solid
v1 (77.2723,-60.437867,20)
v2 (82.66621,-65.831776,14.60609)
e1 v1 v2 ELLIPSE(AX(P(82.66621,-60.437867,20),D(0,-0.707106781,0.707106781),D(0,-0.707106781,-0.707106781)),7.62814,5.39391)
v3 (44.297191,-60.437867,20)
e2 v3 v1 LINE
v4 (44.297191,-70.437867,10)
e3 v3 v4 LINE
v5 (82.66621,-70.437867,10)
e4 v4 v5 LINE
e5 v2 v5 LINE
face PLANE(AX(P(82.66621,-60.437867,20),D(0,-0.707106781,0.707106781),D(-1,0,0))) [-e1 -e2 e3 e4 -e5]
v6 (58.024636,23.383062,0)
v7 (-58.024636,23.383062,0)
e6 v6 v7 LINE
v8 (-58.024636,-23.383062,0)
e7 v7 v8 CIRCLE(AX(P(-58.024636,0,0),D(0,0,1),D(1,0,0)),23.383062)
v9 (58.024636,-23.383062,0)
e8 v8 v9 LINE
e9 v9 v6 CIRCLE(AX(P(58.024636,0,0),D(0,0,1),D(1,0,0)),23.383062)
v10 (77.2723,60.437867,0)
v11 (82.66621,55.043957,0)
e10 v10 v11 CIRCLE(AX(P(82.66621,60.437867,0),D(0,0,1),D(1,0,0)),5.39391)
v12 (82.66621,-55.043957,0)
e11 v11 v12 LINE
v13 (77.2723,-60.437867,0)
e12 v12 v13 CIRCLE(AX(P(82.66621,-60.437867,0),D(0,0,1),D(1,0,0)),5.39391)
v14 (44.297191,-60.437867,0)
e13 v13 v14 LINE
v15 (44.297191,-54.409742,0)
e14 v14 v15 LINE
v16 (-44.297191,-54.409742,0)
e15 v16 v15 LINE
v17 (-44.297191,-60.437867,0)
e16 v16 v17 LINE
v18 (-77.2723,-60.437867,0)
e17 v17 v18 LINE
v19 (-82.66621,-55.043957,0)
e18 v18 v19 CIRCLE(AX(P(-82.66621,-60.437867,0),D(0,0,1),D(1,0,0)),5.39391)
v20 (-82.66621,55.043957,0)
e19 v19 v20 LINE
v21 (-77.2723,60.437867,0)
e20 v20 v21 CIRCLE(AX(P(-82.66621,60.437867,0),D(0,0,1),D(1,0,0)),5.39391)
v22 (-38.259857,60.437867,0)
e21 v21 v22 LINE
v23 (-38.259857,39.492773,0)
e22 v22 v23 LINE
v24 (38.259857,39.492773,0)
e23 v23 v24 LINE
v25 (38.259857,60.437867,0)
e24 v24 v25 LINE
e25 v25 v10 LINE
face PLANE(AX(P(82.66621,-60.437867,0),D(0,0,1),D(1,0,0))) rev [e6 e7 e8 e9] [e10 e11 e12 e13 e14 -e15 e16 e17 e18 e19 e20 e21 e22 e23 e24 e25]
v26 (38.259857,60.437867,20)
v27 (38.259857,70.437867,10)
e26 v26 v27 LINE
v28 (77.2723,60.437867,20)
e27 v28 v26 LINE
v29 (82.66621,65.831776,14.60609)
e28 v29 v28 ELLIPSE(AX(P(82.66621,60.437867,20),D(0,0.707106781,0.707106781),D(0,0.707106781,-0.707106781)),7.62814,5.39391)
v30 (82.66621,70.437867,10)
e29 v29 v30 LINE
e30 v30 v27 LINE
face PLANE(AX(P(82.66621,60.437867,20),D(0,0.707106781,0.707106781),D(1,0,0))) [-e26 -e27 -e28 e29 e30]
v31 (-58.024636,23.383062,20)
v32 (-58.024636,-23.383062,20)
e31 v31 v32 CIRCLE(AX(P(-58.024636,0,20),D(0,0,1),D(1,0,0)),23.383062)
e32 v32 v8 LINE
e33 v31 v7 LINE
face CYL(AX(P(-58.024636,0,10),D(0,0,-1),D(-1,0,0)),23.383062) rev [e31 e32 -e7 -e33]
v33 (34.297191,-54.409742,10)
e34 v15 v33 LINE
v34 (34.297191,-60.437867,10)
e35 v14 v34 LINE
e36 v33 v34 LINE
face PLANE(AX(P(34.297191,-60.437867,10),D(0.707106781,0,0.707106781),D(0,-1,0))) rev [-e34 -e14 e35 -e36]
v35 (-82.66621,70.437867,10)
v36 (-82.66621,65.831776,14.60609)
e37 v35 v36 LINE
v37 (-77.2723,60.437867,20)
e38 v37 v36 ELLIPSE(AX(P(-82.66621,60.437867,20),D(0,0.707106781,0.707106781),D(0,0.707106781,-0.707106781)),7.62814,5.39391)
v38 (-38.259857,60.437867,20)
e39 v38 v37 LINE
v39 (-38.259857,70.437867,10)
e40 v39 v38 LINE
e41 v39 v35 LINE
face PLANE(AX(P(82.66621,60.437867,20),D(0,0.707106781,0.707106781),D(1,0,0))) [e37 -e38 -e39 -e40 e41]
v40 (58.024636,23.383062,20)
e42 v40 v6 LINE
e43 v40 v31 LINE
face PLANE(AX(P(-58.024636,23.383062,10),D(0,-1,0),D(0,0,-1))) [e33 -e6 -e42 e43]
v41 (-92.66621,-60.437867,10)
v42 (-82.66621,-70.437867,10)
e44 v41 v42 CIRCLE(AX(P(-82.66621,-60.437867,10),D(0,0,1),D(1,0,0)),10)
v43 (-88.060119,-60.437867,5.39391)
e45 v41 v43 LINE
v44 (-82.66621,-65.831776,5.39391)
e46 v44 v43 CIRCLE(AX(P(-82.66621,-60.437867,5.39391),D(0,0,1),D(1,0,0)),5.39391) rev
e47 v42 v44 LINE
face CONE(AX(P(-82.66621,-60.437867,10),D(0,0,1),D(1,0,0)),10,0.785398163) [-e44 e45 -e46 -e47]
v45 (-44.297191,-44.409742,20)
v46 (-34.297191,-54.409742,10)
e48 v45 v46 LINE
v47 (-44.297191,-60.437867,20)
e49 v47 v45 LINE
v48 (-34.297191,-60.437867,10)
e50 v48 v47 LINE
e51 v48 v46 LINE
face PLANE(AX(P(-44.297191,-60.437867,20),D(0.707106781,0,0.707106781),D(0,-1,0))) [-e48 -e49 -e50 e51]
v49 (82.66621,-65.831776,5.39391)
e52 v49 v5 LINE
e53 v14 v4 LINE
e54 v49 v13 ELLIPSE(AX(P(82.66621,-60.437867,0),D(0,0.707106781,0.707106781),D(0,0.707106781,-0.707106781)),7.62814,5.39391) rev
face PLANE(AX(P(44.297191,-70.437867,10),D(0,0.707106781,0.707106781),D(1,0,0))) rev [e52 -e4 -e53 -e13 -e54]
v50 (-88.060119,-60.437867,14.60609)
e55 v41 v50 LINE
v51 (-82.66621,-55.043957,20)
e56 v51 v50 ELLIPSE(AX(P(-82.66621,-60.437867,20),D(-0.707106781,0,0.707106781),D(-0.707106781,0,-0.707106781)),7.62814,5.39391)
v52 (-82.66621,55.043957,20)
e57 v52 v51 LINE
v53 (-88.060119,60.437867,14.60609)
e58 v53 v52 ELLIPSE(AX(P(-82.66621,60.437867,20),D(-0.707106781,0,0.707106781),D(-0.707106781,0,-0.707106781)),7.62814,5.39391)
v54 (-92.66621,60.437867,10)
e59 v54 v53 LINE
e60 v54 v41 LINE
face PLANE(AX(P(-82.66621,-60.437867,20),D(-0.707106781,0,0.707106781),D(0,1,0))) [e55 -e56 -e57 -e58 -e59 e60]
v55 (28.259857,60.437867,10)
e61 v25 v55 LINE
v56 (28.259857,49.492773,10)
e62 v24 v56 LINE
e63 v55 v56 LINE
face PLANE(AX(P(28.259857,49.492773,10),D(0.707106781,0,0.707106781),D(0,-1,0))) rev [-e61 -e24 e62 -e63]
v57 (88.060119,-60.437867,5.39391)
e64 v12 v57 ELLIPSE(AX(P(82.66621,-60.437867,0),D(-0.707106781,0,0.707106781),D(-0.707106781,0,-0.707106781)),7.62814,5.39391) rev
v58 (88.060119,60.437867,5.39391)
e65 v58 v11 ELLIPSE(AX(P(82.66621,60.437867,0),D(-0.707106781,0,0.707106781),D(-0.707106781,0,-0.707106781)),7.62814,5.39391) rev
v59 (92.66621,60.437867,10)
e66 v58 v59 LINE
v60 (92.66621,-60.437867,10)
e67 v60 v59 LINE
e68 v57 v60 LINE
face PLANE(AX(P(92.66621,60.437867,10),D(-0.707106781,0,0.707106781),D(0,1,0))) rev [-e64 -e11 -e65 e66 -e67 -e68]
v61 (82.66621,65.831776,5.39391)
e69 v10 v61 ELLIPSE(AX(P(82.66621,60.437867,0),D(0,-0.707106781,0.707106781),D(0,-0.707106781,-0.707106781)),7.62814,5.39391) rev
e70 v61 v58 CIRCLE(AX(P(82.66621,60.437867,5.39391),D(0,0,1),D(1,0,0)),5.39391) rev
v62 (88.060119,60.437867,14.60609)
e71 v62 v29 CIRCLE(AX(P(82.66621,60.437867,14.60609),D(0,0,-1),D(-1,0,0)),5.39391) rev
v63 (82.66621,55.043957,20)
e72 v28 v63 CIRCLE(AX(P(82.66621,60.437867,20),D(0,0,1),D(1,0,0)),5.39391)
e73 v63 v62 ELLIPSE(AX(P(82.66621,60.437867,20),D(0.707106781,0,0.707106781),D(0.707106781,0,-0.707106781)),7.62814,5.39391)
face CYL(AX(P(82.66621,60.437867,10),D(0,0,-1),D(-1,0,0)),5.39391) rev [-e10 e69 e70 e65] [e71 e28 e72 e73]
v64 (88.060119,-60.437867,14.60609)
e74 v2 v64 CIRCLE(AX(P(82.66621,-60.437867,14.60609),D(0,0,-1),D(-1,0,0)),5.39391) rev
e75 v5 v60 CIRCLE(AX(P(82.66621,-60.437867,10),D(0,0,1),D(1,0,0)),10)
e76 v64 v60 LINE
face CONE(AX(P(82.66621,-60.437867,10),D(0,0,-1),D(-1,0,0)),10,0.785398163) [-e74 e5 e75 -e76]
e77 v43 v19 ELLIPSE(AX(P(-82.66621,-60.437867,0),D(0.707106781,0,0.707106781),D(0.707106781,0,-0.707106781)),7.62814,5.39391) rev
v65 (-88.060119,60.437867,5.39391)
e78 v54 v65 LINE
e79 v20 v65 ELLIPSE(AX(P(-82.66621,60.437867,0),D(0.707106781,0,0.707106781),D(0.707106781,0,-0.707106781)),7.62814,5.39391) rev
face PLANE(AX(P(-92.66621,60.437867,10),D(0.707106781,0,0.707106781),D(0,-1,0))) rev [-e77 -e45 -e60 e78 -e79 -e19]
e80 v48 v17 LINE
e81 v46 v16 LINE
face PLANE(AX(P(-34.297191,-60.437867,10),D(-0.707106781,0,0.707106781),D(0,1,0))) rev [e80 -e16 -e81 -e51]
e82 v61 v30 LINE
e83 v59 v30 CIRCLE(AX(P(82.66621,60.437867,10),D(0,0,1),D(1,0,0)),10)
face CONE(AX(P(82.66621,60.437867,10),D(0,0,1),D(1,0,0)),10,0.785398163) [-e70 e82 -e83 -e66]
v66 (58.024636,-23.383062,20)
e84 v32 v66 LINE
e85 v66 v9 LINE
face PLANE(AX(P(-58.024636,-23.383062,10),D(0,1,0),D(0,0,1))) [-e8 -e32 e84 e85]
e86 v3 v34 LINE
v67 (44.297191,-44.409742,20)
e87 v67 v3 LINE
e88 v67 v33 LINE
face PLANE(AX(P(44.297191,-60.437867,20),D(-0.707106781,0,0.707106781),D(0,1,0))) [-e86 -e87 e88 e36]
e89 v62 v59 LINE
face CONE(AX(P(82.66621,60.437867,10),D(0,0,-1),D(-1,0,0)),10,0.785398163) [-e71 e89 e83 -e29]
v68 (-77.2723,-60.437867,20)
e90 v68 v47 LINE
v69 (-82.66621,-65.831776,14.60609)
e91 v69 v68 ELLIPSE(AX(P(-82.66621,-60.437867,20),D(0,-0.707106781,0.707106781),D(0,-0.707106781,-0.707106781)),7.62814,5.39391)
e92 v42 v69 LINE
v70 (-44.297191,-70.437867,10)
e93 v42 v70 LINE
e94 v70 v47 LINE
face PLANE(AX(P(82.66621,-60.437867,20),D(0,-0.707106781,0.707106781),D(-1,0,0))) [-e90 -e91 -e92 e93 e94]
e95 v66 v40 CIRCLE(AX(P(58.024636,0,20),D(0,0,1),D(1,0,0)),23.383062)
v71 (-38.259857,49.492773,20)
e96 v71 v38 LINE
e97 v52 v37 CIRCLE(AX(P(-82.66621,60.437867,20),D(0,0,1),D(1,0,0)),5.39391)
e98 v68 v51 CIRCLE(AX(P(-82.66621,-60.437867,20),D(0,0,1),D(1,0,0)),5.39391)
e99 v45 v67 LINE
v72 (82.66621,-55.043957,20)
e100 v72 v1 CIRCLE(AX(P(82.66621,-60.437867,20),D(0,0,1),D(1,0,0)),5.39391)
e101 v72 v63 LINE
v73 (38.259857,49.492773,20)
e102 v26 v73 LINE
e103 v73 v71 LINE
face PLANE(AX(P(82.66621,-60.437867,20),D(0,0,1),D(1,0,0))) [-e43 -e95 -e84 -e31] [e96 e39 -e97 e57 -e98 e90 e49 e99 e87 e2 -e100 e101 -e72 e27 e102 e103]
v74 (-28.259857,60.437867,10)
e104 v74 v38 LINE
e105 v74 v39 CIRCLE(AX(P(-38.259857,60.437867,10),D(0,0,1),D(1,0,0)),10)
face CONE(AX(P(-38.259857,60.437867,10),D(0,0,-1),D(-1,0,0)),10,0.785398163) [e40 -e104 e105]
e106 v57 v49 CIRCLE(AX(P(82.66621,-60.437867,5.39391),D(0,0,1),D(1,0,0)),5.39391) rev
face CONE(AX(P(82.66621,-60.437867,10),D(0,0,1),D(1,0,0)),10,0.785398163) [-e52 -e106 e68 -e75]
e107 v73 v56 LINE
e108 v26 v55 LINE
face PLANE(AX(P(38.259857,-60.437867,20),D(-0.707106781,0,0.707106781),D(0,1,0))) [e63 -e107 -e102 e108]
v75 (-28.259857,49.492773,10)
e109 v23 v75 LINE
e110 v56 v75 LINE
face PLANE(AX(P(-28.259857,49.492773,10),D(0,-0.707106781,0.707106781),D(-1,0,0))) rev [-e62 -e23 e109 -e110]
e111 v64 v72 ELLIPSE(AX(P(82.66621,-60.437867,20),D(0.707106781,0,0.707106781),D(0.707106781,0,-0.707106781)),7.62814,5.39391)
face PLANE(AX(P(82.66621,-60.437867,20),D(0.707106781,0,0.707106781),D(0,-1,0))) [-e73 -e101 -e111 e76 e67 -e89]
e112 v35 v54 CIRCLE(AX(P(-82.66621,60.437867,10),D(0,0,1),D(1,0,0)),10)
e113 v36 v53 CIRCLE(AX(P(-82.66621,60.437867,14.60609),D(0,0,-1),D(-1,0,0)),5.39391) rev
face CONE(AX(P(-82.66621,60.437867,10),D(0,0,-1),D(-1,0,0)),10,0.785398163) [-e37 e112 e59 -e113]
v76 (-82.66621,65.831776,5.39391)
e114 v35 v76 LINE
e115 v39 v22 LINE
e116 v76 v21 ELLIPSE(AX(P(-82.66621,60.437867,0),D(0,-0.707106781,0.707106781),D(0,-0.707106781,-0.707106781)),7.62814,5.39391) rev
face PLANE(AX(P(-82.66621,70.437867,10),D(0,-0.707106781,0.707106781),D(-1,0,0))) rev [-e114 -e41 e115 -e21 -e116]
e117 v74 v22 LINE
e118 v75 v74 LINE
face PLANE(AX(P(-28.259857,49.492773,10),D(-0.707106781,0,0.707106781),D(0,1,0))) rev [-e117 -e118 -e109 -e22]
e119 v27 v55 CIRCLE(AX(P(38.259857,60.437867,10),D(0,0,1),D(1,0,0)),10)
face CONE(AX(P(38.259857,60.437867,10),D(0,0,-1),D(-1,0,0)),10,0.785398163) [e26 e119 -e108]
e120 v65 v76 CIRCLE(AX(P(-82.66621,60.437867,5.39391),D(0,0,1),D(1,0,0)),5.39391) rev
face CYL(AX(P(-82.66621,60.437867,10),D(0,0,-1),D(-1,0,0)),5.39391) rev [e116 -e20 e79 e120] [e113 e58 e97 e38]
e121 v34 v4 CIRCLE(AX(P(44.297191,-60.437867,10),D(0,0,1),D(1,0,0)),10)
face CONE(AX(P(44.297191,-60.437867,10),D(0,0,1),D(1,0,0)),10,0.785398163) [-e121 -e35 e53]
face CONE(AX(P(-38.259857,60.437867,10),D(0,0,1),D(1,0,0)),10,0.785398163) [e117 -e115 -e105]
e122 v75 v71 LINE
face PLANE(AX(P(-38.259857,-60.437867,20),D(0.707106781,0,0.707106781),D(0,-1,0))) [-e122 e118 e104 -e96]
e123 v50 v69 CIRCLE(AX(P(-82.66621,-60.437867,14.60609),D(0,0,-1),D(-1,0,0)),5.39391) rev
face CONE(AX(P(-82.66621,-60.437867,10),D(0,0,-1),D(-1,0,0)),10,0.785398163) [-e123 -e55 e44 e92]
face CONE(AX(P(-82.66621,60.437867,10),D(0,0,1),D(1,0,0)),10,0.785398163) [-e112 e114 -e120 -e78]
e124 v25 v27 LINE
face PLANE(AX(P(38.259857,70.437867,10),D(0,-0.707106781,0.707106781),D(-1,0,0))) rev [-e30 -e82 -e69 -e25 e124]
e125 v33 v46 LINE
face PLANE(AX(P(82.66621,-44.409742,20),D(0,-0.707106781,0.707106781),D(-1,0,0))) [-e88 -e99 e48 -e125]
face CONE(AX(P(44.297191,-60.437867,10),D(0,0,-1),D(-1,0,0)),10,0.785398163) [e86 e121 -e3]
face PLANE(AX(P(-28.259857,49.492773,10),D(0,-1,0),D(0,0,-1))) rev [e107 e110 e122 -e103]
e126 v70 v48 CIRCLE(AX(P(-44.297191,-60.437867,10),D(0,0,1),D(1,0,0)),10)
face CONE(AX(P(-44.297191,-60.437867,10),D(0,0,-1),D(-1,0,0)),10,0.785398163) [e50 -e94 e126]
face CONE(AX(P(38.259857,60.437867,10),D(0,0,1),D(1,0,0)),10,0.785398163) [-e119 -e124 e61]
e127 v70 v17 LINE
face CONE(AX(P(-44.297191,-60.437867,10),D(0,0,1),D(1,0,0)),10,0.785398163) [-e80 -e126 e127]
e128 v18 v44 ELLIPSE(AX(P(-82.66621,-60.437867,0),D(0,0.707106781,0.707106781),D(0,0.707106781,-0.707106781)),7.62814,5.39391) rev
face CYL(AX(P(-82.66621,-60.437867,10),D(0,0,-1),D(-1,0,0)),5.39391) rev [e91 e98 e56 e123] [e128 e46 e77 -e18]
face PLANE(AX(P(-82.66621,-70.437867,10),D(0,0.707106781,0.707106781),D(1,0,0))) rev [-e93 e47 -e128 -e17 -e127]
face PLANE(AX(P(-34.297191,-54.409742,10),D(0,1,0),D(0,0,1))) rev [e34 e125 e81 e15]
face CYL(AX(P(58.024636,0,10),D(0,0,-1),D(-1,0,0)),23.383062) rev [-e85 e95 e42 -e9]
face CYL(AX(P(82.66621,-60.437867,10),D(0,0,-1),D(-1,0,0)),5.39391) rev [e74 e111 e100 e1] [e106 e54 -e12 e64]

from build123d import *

# Parameters (mm, degrees)
SKETCH2_R           = 5.393909569
BOSS_EXTRUDE1_DEPTH = 10
SKETCH2_2_R         = 5.393909569
BOSS_EXTRUDE2_DEPTH = 20
CHAMFER1_SIZE       = 10
CHAMFER3_SIZE       = 10
CHAMFER4_SIZE       = 10
CHAMFER5_SIZE       = 10
CHAMFER6_SIZE       = 10


with BuildPart() as part:
    # Sketch2 → Boss-Extrude1 (new body)
    with BuildSketch(Plane.XY):
        with BuildLine():
            Line((-82.666209824, 70.437866658), (-38.259856652, 70.437866658))
            ThreePointArc((-38.259856652, 70.437866658), (-31.18878884, 67.50893447), (-28.259856652, 60.437866658))
            Line((-28.259856652, 60.437866658), (-28.259856652, 49.492772702))
            Line((-28.259856652, 49.492772702), (28.259856652, 49.492772702))
            Line((28.259856652, 49.492772702), (28.259856652, 60.437866658))
            ThreePointArc((28.259856652, 60.437866658), (31.18878884, 67.50893447), (38.259856652, 70.437866658))
            Line((38.259856652, 70.437866658), (82.666209824, 70.437866658))
            ThreePointArc((82.666209824, 70.437866658), (89.737277636, 67.50893447), (92.666209824, 60.437866658))
            Line((92.666209824, 60.437866658), (92.666209824, -60.437866658))
            ThreePointArc((92.666209824, -60.437866658), (89.737277636, -67.50893447), (82.666209824, -70.437866658))
            Line((82.666209824, -70.437866658), (44.297191223, -70.437866658))
            ThreePointArc((44.297191223, -70.437866658), (37.226123411, -67.50893447), (34.297191223, -60.437866658))
            Line((34.297191223, -60.437866658), (34.297191223, -54.409741631))
            Line((34.297191223, -54.409741631), (-34.297191223, -54.409741631))
            Line((-34.297191223, -54.409741631), (-34.297191223, -60.437866658))
            ThreePointArc((-34.297191223, -60.437866658), (-37.226123411, -67.50893447), (-44.297191223, -70.437866658))
            Line((-44.297191223, -70.437866658), (-82.666209824, -70.437866658))
            ThreePointArc((-82.666209824, -70.437866658), (-89.737277636, -67.50893447), (-92.666209824, -60.437866658))
            Line((-92.666209824, -60.437866658), (-92.666209824, 60.437866658))
            ThreePointArc((-92.666209824, 60.437866658), (-89.737277636, 67.50893447), (-82.666209824, 70.437866658))
        make_face()
        with Locations((82.666209824, -60.437866658)):
            Circle(SKETCH2_R, mode=Mode.SUBTRACT)
        with Locations((82.666209824, 60.437866658)):
            Circle(SKETCH2_R, mode=Mode.SUBTRACT)
        with Locations((-82.666209824, 60.437866658)):
            Circle(SKETCH2_R, mode=Mode.SUBTRACT)
        with Locations((-82.666209824, -60.437866658)):
            Circle(SKETCH2_R, mode=Mode.SUBTRACT)
        with BuildLine():
            Line((-58.024636058, 23.383062292), (58.024636058, 23.383062292))
            ThreePointArc((58.024636058, 23.383062292), (81.40769835, 0), (58.024636058, -23.383062292))
            Line((58.024636058, -23.383062292), (-58.024636058, -23.383062292))
            ThreePointArc((-58.024636058, -23.383062292), (-81.40769835, 0), (-58.024636058, 23.383062292))
        make_face(mode=Mode.SUBTRACT)
    extrude(amount=BOSS_EXTRUDE1_DEPTH)

    # Sketch2<2> → Boss-Extrude2 (add)
    with BuildSketch(Plane.XY):
        with BuildLine():
            Line((-82.666209824, 70.437866658), (-38.259856652, 70.437866658))
            ThreePointArc((-38.259856652, 70.437866658), (-31.18878884, 67.50893447), (-28.259856652, 60.437866658))
            Line((-28.259856652, 60.437866658), (-28.259856652, 49.492772702))
            Line((-28.259856652, 49.492772702), (28.259856652, 49.492772702))
            Line((28.259856652, 49.492772702), (28.259856652, 60.437866658))
            ThreePointArc((28.259856652, 60.437866658), (31.18878884, 67.50893447), (38.259856652, 70.437866658))
            Line((38.259856652, 70.437866658), (82.666209824, 70.437866658))
            ThreePointArc((82.666209824, 70.437866658), (89.737277636, 67.50893447), (92.666209824, 60.437866658))
            Line((92.666209824, 60.437866658), (92.666209824, -60.437866658))
            ThreePointArc((92.666209824, -60.437866658), (89.737277636, -67.50893447), (82.666209824, -70.437866658))
            Line((82.666209824, -70.437866658), (44.297191223, -70.437866658))
            ThreePointArc((44.297191223, -70.437866658), (37.226123411, -67.50893447), (34.297191223, -60.437866658))
            Line((34.297191223, -60.437866658), (34.297191223, -54.409741631))
            Line((34.297191223, -54.409741631), (-34.297191223, -54.409741631))
            Line((-34.297191223, -54.409741631), (-34.297191223, -60.437866658))
            ThreePointArc((-34.297191223, -60.437866658), (-37.226123411, -67.50893447), (-44.297191223, -70.437866658))
            Line((-44.297191223, -70.437866658), (-82.666209824, -70.437866658))
            ThreePointArc((-82.666209824, -70.437866658), (-89.737277636, -67.50893447), (-92.666209824, -60.437866658))
            Line((-92.666209824, -60.437866658), (-92.666209824, 60.437866658))
            ThreePointArc((-92.666209824, 60.437866658), (-89.737277636, 67.50893447), (-82.666209824, 70.437866658))
        make_face()
        with Locations((82.666209824, -60.437866658)):
            Circle(SKETCH2_2_R, mode=Mode.SUBTRACT)
        with Locations((82.666209824, 60.437866658)):
            Circle(SKETCH2_2_R, mode=Mode.SUBTRACT)
        with Locations((-82.666209824, 60.437866658)):
            Circle(SKETCH2_2_R, mode=Mode.SUBTRACT)
        with Locations((-82.666209824, -60.437866658)):
            Circle(SKETCH2_2_R, mode=Mode.SUBTRACT)
        with BuildLine():
            Line((-58.024636058, 23.383062292), (58.024636058, 23.383062292))
            ThreePointArc((58.024636058, 23.383062292), (81.40769835, 0), (58.024636058, -23.383062292))
            Line((58.024636058, -23.383062292), (-58.024636058, -23.383062292))
            ThreePointArc((-58.024636058, -23.383062292), (-81.40769835, 0), (-58.024636058, 23.383062292))
        make_face(mode=Mode.SUBTRACT)
    extrude(amount=BOSS_EXTRUDE2_DEPTH)

    # Chamfer1
    # the kernel refuses this chamfer: 10 mm, written as the material it takes off along each edge
    with BuildSketch(Plane(origin=(82.666209824, -70.437866658, 0), x_dir=(0, 1, 0), z_dir=(-1, 0, 0))) as chamfer1_piece_1:
        Polygon((CHAMFER1_SIZE, 0), (0, -CHAMFER1_SIZE), (0, 0), align=None)
    extrude(amount=38.369018602, mode=Mode.SUBTRACT)
    with BuildSketch(Plane(origin=(44.297191223, -60.437866658, 0), x_dir=(0, -1, 0), z_dir=(1, 0, 0))) as chamfer1_piece_2:
        Polygon((10 - CHAMFER1_SIZE, 0), (10, -CHAMFER1_SIZE), (10, 0), align=None)
    revolve(axis=Axis((44.297191223, -60.437866658, 0), (0, 0, -1)), revolution_arc=90, mode=Mode.SUBTRACT)
    with BuildSketch(Plane(origin=(34.297191223, -60.437866658, 0), x_dir=(1, 0, 0), z_dir=(0, 1, 0))) as chamfer1_piece_3:
        Polygon((CHAMFER1_SIZE, 0), (0, -CHAMFER1_SIZE), (0, 0), align=None)
    extrude(amount=6.028125027, mode=Mode.SUBTRACT)
    with BuildSketch(Plane(origin=(-28.259856652, 49.492772702, 0), x_dir=(0, -1, 0), z_dir=(1, 0, 0))) as chamfer1_piece_4:
        Polygon((CHAMFER1_SIZE, 0), (0, -CHAMFER1_SIZE), (0, 0), align=None)
    extrude(amount=56.519713304, mode=Mode.SUBTRACT)
    with BuildSketch(Plane(origin=(28.259856652, 49.492772702, 0), x_dir=(1, 0, 0), z_dir=(0, 1, 0))) as chamfer1_piece_5:
        Polygon((CHAMFER1_SIZE, 0), (0, -CHAMFER1_SIZE), (0, 0), align=None)
    extrude(amount=10.945093956, mode=Mode.SUBTRACT)
    with BuildSketch(Plane(origin=(38.259856652, 60.437866658, 0), x_dir=(-1, 0, 0), z_dir=(0, -1, 0))) as chamfer1_piece_6:
        Polygon((10 - CHAMFER1_SIZE, 0), (10, -CHAMFER1_SIZE), (10, 0), align=None)
    revolve(axis=Axis((38.259856652, 60.437866658, 0), (0, 0, -1)), revolution_arc=90, mode=Mode.SUBTRACT)
    with BuildSketch(Plane(origin=(38.259856652, 70.437866658, 0), x_dir=(0, -1, 0), z_dir=(1, 0, 0))) as chamfer1_piece_7:
        Polygon((CHAMFER1_SIZE, 0), (0, -CHAMFER1_SIZE), (0, 0), align=None)
    extrude(amount=44.406353173, mode=Mode.SUBTRACT)
    with BuildSketch(Plane(origin=(82.666209824, 60.437866658, 0), x_dir=(0, 1, 0), z_dir=(-1, 0, 0))) as chamfer1_piece_8:
        Polygon((10 - CHAMFER1_SIZE, 0), (10, -CHAMFER1_SIZE), (10, 0), align=None)
    revolve(axis=Axis((82.666209824, 60.437866658, 0), (0, 0, -1)), revolution_arc=90, mode=Mode.SUBTRACT)
    with BuildSketch(Plane(origin=(92.666209824, 60.437866658, 0), x_dir=(-1, 0, 0), z_dir=(0, -1, 0))) as chamfer1_piece_9:
        Polygon((CHAMFER1_SIZE, 0), (0, -CHAMFER1_SIZE), (0, 0), align=None)
    extrude(amount=120.875733316, mode=Mode.SUBTRACT)
    with BuildSketch(Plane(origin=(82.666209824, -60.437866658, 0), x_dir=(1, 0, 0), z_dir=(0, 1, 0))) as chamfer1_piece_10:
        Polygon((10 - CHAMFER1_SIZE, 0), (10, -CHAMFER1_SIZE), (10, 0), align=None)
    revolve(axis=Axis((82.666209824, -60.437866658, 0), (0, 0, -1)), revolution_arc=90, mode=Mode.SUBTRACT)
    with BuildSketch(Plane(origin=(-28.259856652, 49.492772702, 0), x_dir=(0, -1, 0), z_dir=(1, 0, 0))) as chamfer1_piece_11a_section:
        Polygon((CHAMFER1_SIZE, 0), (0, -CHAMFER1_SIZE), (0, 0), align=None)
    chamfer1_piece_11a = extrude(amount=82.236543183, mode=Mode.PRIVATE)
    chamfer1_piece_11a = split(chamfer1_piece_11a, bisect_by=Plane(origin=(28.259856652, 49.492772702, 0), z_dir=(1, 0, 0)), keep=Keep.TOP, mode=Mode.PRIVATE)
    with BuildSketch(Plane(origin=(28.259856652, 23.775942822, 0), x_dir=(1, 0, 0), z_dir=(0, 1, 0))) as chamfer1_piece_11b_section:
        Polygon((CHAMFER1_SIZE, 0), (0, -CHAMFER1_SIZE), (0, 0), align=None)
    chamfer1_piece_11b = extrude(amount=36.661923835, mode=Mode.PRIVATE)
    chamfer1_piece_11b = split(chamfer1_piece_11b, bisect_by=Plane(origin=(28.259856652, 49.492772702, 0), z_dir=(0, -1, 0)), keep=Keep.TOP, mode=Mode.PRIVATE)
    chamfer1_piece_11 = chamfer1_piece_11a & chamfer1_piece_11b
    add(chamfer1_piece_11, mode=Mode.SUBTRACT)

    # Chamfer3
    # the kernel refuses this chamfer: 10 mm, written as the material it takes off along each edge
    with BuildSketch(Plane(origin=(-34.297191223, -54.409741631, 0), x_dir=(-1, 0, 0), z_dir=(0, -1, 0))) as chamfer3_piece_1:
        Polygon((CHAMFER3_SIZE, 0), (0, -CHAMFER3_SIZE), (0, 0), align=None)
    extrude(amount=6.028125027, mode=Mode.SUBTRACT)
    with BuildSketch(Plane(origin=(-44.297191223, -60.437866658, 0), x_dir=(1, 0, 0), z_dir=(0, 1, 0))) as chamfer3_piece_2:
        Polygon((10, -CHAMFER3_SIZE), (10 - CHAMFER3_SIZE, 0), (10, 0), align=None)
    revolve(axis=Axis((-44.297191223, -60.437866658, 0), (0, 0, -1)), revolution_arc=90, mode=Mode.SUBTRACT)
    with BuildSketch(Plane(origin=(-44.297191223, -70.437866658, 0), x_dir=(0, 1, 0), z_dir=(-1, 0, 0))) as chamfer3_piece_3:
        Polygon((CHAMFER3_SIZE, 0), (0, -CHAMFER3_SIZE), (0, 0), align=None)
    extrude(amount=38.369018602, mode=Mode.SUBTRACT)
    with BuildSketch(Plane(origin=(-82.666209824, -60.437866658, 0), x_dir=(0, -1, 0), z_dir=(1, 0, 0))) as chamfer3_piece_4:
        Polygon((10 - CHAMFER3_SIZE, 0), (10, -CHAMFER3_SIZE), (10, 0), align=None)
    revolve(axis=Axis((-82.666209824, -60.437866658, 0), (0, 0, -1)), revolution_arc=90, mode=Mode.SUBTRACT)
    with BuildSketch(Plane(origin=(-92.666209824, -60.437866658, 0), x_dir=(1, 0, 0), z_dir=(0, 1, 0))) as chamfer3_piece_5:
        Polygon((CHAMFER3_SIZE, 0), (0, -CHAMFER3_SIZE), (0, 0), align=None)
    extrude(amount=120.875733316, mode=Mode.SUBTRACT)
    with BuildSketch(Plane(origin=(-82.666209824, 60.437866658, 0), x_dir=(-1, 0, 0), z_dir=(0, -1, 0))) as chamfer3_piece_6:
        Polygon((10 - CHAMFER3_SIZE, 0), (10, -CHAMFER3_SIZE), (10, 0), align=None)
    revolve(axis=Axis((-82.666209824, 60.437866658, 0), (0, 0, -1)), revolution_arc=90, mode=Mode.SUBTRACT)
    with BuildSketch(Plane(origin=(-82.666209824, 70.437866658, 0), x_dir=(0, -1, 0), z_dir=(1, 0, 0))) as chamfer3_piece_7:
        Polygon((CHAMFER3_SIZE, 0), (0, -CHAMFER3_SIZE), (0, 0), align=None)
    extrude(amount=44.406353173, mode=Mode.SUBTRACT)
    with BuildSketch(Plane(origin=(-38.259856652, 60.437866658, 0), x_dir=(0, 1, 0), z_dir=(-1, 0, 0))) as chamfer3_piece_8:
        Polygon((10 - CHAMFER3_SIZE, 0), (10, -CHAMFER3_SIZE), (10, 0), align=None)
    revolve(axis=Axis((-38.259856652, 60.437866658, 0), (0, 0, -1)), revolution_arc=90, mode=Mode.SUBTRACT)
    with BuildSketch(Plane(origin=(-28.259856652, 60.437866658, 0), x_dir=(-1, 0, 0), z_dir=(0, -1, 0))) as chamfer3_piece_9_section:
        Polygon((CHAMFER3_SIZE, 0), (0, -CHAMFER3_SIZE), (0, 0), align=None)
    chamfer3_piece_9 = extrude(amount=46.661923835, mode=Mode.PRIVATE)
    chamfer3_piece_9 = split(chamfer3_piece_9, bisect_by=Plane(origin=(-28.259856652, 49.492772702, 0), z_dir=(0, 1, 0)), keep=Keep.TOP, mode=Mode.PRIVATE)
    chamfer3_piece_9 = split(chamfer3_piece_9, bisect_by=Plane(origin=(-28.259856652, 49.96531968, 10.472546978), z_dir=(0, 0.7071067811865476, -0.7071067811865476)), keep=Keep.TOP, mode=Mode.PRIVATE)
    add(chamfer3_piece_9, mode=Mode.SUBTRACT)
    with BuildSketch(Plane(origin=(-28.259856652, 60.437866658, 0), x_dir=(-1, 0, 0), z_dir=(0, -1, 0))) as chamfer3_piece_10_section:
        Polygon((CHAMFER3_SIZE, 0), (0, -CHAMFER3_SIZE), (0, 0), align=None)
    chamfer3_piece_10 = extrude(amount=46.661923835, mode=Mode.PRIVATE)
    chamfer3_piece_10 = split(chamfer3_piece_10, bisect_by=Plane(origin=(-28.259856652, 49.492772702, 0), z_dir=(0, -1, 0)), keep=Keep.TOP, mode=Mode.PRIVATE)
    chamfer3_piece_10 = split(chamfer3_piece_10, bisect_by=Plane(origin=(-28.259856652, 49.96531968, 10.472546978), z_dir=(0, 0.7071067811865476, -0.7071067811865476)), keep=Keep.TOP, mode=Mode.PRIVATE)
    add(chamfer3_piece_10, mode=Mode.SUBTRACT)

    # Chamfer4
    # the kernel refuses this chamfer: 10 mm, written as the material it takes off along each edge
    with BuildSketch(Plane(origin=(28.259856652, 49.492772702, 20), x_dir=(1, 0, 0), z_dir=(0, 1, 0))) as chamfer4_piece_1:
        Polygon((CHAMFER4_SIZE, 0), (0, CHAMFER4_SIZE), (0, 0), align=None)
    extrude(amount=10.945093956, mode=Mode.SUBTRACT)
    with BuildSketch(Plane(origin=(38.259856652, 60.437866658, 20), x_dir=(-1, 0, 0), z_dir=(0, -1, 0))) as chamfer4_piece_2:
        Polygon((10 - CHAMFER4_SIZE, 0), (10, CHAMFER4_SIZE), (10, 0), align=None)
    revolve(axis=Axis((38.259856652, 60.437866658, 20), (0, 0, -1)), revolution_arc=90, mode=Mode.SUBTRACT)
    with BuildSketch(Plane(origin=(38.259856652, 70.437866658, 20), x_dir=(0, -1, 0), z_dir=(1, 0, 0))) as chamfer4_piece_3:
        Polygon((CHAMFER4_SIZE, 0), (0, CHAMFER4_SIZE), (0, 0), align=None)
    extrude(amount=44.406353173, mode=Mode.SUBTRACT)
    with BuildSketch(Plane(origin=(82.666209824, 60.437866658, 20), x_dir=(0, 1, 0), z_dir=(-1, 0, 0))) as chamfer4_piece_4:
        Polygon((10 - CHAMFER4_SIZE, 0), (10, CHAMFER4_SIZE), (10, 0), align=None)
    revolve(axis=Axis((82.666209824, 60.437866658, 20), (0, 0, -1)), revolution_arc=90, mode=Mode.SUBTRACT)
    with BuildSketch(Plane(origin=(92.666209824, 60.437866658, 20), x_dir=(-1, 0, 0), z_dir=(0, -1, 0))) as chamfer4_piece_5:
        Polygon((CHAMFER4_SIZE, 0), (0, CHAMFER4_SIZE), (0, 0), align=None)
    extrude(amount=120.875733316, mode=Mode.SUBTRACT)
    with BuildSketch(Plane(origin=(82.666209824, -60.437866658, 20), x_dir=(1, 0, 0), z_dir=(0, 1, 0))) as chamfer4_piece_6:
        Polygon((10 - CHAMFER4_SIZE, 0), (10, CHAMFER4_SIZE), (10, 0), align=None)
    revolve(axis=Axis((82.666209824, -60.437866658, 20), (0, 0, -1)), revolution_arc=90, mode=Mode.SUBTRACT)
    with BuildSketch(Plane(origin=(82.666209824, -70.437866658, 20), x_dir=(0, 1, 0), z_dir=(-1, 0, 0))) as chamfer4_piece_7:
        Polygon((CHAMFER4_SIZE, 0), (0, CHAMFER4_SIZE), (0, 0), align=None)
    extrude(amount=38.369018602, mode=Mode.SUBTRACT)
    with BuildSketch(Plane(origin=(44.297191223, -60.437866658, 20), x_dir=(0, -1, 0), z_dir=(1, 0, 0))) as chamfer4_piece_8:
        Polygon((10 - CHAMFER4_SIZE, 0), (10, CHAMFER4_SIZE), (10, 0), align=None)
    revolve(axis=Axis((44.297191223, -60.437866658, 20), (0, 0, -1)), revolution_arc=90, mode=Mode.SUBTRACT)
    with BuildSketch(Plane(origin=(34.297191223, -60.437866658, 20), x_dir=(1, 0, 0), z_dir=(0, 1, 0))) as chamfer4_piece_9:
        Polygon((CHAMFER4_SIZE, 0), (0, CHAMFER4_SIZE), (0, 0), align=None)
    extrude(amount=6.028125027, mode=Mode.SUBTRACT)

    # Chamfer5
    chamfer5_edges = [part.edges().sort_by_distance(p)[0] for p in [
        (5, -54.409741631, 20),
    ]]
    chamfer(chamfer5_edges, length=CHAMFER5_SIZE)

    # Chamfer6
    # the kernel refuses this chamfer: 10 mm, written as the material it takes off along each edge
    with BuildSketch(Plane(origin=(-28.259856652, 60.437866658, 20), x_dir=(-1, 0, 0), z_dir=(0, -1, 0))) as chamfer6_piece_1:
        Polygon((CHAMFER6_SIZE, 0), (0, CHAMFER6_SIZE), (0, 0), align=None)
    extrude(amount=10.945093956, mode=Mode.SUBTRACT)
    with BuildSketch(Plane(origin=(-38.259856652, 60.437866658, 20), x_dir=(0, 1, 0), z_dir=(-1, 0, 0))) as chamfer6_piece_2:
        Polygon((10 - CHAMFER6_SIZE, 0), (10, CHAMFER6_SIZE), (10, 0), align=None)
    revolve(axis=Axis((-38.259856652, 60.437866658, 20), (0, 0, -1)), revolution_arc=90, mode=Mode.SUBTRACT)
    with BuildSketch(Plane(origin=(-82.666209824, 70.437866658, 20), x_dir=(0, -1, 0), z_dir=(1, 0, 0))) as chamfer6_piece_3:
        Polygon((CHAMFER6_SIZE, 0), (0, CHAMFER6_SIZE), (0, 0), align=None)
    extrude(amount=44.406353173, mode=Mode.SUBTRACT)
    with BuildSketch(Plane(origin=(-82.666209824, 60.437866658, 20), x_dir=(-1, 0, 0), z_dir=(0, -1, 0))) as chamfer6_piece_4:
        Polygon((10 - CHAMFER6_SIZE, 0), (10, CHAMFER6_SIZE), (10, 0), align=None)
    revolve(axis=Axis((-82.666209824, 60.437866658, 20), (0, 0, -1)), revolution_arc=90, mode=Mode.SUBTRACT)
    with BuildSketch(Plane(origin=(-92.666209824, -60.437866658, 20), x_dir=(1, 0, 0), z_dir=(0, 1, 0))) as chamfer6_piece_5:
        Polygon((CHAMFER6_SIZE, 0), (0, CHAMFER6_SIZE), (0, 0), align=None)
    extrude(amount=120.875733316, mode=Mode.SUBTRACT)
    with BuildSketch(Plane(origin=(-82.666209824, -60.437866658, 20), x_dir=(0, -1, 0), z_dir=(1, 0, 0))) as chamfer6_piece_6:
        Polygon((10 - CHAMFER6_SIZE, 0), (10, CHAMFER6_SIZE), (10, 0), align=None)
    revolve(axis=Axis((-82.666209824, -60.437866658, 20), (0, 0, -1)), revolution_arc=90, mode=Mode.SUBTRACT)
    with BuildSketch(Plane(origin=(-44.297191223, -70.437866658, 20), x_dir=(0, 1, 0), z_dir=(-1, 0, 0))) as chamfer6_piece_7:
        Polygon((CHAMFER6_SIZE, 0), (0, CHAMFER6_SIZE), (0, 0), align=None)
    extrude(amount=38.369018602, mode=Mode.SUBTRACT)
    with BuildSketch(Plane(origin=(-44.297191223, -60.437866658, 20), x_dir=(1, 0, 0), z_dir=(0, 1, 0))) as chamfer6_piece_8:
        Polygon((10 - CHAMFER6_SIZE, 0), (10, CHAMFER6_SIZE), (10, 0), align=None)
    revolve(axis=Axis((-44.297191223, -60.437866658, 20), (0, 0, -1)), revolution_arc=90, mode=Mode.SUBTRACT)
    with BuildSketch(Plane(origin=(-34.297191223, -60.437866658, 20), x_dir=(-1, 0, 0), z_dir=(0, 1, 0))) as chamfer6_piece_9_section:
        Polygon((CHAMFER6_SIZE, 0), (0, -CHAMFER6_SIZE), (0, 0), align=None)
    chamfer6_piece_9 = extrude(amount=41.744954906, mode=Mode.PRIVATE)
    chamfer6_piece_9 = split(chamfer6_piece_9, bisect_by=Plane(origin=(-34.297191223, -52.423804144, 11.985937487), z_dir=(0, -0.7071067811865476, 0.7071067811865476)), keep=Keep.TOP, mode=Mode.PRIVATE)
    add(chamfer6_piece_9, mode=Mode.SUBTRACT)


solid = part.part
